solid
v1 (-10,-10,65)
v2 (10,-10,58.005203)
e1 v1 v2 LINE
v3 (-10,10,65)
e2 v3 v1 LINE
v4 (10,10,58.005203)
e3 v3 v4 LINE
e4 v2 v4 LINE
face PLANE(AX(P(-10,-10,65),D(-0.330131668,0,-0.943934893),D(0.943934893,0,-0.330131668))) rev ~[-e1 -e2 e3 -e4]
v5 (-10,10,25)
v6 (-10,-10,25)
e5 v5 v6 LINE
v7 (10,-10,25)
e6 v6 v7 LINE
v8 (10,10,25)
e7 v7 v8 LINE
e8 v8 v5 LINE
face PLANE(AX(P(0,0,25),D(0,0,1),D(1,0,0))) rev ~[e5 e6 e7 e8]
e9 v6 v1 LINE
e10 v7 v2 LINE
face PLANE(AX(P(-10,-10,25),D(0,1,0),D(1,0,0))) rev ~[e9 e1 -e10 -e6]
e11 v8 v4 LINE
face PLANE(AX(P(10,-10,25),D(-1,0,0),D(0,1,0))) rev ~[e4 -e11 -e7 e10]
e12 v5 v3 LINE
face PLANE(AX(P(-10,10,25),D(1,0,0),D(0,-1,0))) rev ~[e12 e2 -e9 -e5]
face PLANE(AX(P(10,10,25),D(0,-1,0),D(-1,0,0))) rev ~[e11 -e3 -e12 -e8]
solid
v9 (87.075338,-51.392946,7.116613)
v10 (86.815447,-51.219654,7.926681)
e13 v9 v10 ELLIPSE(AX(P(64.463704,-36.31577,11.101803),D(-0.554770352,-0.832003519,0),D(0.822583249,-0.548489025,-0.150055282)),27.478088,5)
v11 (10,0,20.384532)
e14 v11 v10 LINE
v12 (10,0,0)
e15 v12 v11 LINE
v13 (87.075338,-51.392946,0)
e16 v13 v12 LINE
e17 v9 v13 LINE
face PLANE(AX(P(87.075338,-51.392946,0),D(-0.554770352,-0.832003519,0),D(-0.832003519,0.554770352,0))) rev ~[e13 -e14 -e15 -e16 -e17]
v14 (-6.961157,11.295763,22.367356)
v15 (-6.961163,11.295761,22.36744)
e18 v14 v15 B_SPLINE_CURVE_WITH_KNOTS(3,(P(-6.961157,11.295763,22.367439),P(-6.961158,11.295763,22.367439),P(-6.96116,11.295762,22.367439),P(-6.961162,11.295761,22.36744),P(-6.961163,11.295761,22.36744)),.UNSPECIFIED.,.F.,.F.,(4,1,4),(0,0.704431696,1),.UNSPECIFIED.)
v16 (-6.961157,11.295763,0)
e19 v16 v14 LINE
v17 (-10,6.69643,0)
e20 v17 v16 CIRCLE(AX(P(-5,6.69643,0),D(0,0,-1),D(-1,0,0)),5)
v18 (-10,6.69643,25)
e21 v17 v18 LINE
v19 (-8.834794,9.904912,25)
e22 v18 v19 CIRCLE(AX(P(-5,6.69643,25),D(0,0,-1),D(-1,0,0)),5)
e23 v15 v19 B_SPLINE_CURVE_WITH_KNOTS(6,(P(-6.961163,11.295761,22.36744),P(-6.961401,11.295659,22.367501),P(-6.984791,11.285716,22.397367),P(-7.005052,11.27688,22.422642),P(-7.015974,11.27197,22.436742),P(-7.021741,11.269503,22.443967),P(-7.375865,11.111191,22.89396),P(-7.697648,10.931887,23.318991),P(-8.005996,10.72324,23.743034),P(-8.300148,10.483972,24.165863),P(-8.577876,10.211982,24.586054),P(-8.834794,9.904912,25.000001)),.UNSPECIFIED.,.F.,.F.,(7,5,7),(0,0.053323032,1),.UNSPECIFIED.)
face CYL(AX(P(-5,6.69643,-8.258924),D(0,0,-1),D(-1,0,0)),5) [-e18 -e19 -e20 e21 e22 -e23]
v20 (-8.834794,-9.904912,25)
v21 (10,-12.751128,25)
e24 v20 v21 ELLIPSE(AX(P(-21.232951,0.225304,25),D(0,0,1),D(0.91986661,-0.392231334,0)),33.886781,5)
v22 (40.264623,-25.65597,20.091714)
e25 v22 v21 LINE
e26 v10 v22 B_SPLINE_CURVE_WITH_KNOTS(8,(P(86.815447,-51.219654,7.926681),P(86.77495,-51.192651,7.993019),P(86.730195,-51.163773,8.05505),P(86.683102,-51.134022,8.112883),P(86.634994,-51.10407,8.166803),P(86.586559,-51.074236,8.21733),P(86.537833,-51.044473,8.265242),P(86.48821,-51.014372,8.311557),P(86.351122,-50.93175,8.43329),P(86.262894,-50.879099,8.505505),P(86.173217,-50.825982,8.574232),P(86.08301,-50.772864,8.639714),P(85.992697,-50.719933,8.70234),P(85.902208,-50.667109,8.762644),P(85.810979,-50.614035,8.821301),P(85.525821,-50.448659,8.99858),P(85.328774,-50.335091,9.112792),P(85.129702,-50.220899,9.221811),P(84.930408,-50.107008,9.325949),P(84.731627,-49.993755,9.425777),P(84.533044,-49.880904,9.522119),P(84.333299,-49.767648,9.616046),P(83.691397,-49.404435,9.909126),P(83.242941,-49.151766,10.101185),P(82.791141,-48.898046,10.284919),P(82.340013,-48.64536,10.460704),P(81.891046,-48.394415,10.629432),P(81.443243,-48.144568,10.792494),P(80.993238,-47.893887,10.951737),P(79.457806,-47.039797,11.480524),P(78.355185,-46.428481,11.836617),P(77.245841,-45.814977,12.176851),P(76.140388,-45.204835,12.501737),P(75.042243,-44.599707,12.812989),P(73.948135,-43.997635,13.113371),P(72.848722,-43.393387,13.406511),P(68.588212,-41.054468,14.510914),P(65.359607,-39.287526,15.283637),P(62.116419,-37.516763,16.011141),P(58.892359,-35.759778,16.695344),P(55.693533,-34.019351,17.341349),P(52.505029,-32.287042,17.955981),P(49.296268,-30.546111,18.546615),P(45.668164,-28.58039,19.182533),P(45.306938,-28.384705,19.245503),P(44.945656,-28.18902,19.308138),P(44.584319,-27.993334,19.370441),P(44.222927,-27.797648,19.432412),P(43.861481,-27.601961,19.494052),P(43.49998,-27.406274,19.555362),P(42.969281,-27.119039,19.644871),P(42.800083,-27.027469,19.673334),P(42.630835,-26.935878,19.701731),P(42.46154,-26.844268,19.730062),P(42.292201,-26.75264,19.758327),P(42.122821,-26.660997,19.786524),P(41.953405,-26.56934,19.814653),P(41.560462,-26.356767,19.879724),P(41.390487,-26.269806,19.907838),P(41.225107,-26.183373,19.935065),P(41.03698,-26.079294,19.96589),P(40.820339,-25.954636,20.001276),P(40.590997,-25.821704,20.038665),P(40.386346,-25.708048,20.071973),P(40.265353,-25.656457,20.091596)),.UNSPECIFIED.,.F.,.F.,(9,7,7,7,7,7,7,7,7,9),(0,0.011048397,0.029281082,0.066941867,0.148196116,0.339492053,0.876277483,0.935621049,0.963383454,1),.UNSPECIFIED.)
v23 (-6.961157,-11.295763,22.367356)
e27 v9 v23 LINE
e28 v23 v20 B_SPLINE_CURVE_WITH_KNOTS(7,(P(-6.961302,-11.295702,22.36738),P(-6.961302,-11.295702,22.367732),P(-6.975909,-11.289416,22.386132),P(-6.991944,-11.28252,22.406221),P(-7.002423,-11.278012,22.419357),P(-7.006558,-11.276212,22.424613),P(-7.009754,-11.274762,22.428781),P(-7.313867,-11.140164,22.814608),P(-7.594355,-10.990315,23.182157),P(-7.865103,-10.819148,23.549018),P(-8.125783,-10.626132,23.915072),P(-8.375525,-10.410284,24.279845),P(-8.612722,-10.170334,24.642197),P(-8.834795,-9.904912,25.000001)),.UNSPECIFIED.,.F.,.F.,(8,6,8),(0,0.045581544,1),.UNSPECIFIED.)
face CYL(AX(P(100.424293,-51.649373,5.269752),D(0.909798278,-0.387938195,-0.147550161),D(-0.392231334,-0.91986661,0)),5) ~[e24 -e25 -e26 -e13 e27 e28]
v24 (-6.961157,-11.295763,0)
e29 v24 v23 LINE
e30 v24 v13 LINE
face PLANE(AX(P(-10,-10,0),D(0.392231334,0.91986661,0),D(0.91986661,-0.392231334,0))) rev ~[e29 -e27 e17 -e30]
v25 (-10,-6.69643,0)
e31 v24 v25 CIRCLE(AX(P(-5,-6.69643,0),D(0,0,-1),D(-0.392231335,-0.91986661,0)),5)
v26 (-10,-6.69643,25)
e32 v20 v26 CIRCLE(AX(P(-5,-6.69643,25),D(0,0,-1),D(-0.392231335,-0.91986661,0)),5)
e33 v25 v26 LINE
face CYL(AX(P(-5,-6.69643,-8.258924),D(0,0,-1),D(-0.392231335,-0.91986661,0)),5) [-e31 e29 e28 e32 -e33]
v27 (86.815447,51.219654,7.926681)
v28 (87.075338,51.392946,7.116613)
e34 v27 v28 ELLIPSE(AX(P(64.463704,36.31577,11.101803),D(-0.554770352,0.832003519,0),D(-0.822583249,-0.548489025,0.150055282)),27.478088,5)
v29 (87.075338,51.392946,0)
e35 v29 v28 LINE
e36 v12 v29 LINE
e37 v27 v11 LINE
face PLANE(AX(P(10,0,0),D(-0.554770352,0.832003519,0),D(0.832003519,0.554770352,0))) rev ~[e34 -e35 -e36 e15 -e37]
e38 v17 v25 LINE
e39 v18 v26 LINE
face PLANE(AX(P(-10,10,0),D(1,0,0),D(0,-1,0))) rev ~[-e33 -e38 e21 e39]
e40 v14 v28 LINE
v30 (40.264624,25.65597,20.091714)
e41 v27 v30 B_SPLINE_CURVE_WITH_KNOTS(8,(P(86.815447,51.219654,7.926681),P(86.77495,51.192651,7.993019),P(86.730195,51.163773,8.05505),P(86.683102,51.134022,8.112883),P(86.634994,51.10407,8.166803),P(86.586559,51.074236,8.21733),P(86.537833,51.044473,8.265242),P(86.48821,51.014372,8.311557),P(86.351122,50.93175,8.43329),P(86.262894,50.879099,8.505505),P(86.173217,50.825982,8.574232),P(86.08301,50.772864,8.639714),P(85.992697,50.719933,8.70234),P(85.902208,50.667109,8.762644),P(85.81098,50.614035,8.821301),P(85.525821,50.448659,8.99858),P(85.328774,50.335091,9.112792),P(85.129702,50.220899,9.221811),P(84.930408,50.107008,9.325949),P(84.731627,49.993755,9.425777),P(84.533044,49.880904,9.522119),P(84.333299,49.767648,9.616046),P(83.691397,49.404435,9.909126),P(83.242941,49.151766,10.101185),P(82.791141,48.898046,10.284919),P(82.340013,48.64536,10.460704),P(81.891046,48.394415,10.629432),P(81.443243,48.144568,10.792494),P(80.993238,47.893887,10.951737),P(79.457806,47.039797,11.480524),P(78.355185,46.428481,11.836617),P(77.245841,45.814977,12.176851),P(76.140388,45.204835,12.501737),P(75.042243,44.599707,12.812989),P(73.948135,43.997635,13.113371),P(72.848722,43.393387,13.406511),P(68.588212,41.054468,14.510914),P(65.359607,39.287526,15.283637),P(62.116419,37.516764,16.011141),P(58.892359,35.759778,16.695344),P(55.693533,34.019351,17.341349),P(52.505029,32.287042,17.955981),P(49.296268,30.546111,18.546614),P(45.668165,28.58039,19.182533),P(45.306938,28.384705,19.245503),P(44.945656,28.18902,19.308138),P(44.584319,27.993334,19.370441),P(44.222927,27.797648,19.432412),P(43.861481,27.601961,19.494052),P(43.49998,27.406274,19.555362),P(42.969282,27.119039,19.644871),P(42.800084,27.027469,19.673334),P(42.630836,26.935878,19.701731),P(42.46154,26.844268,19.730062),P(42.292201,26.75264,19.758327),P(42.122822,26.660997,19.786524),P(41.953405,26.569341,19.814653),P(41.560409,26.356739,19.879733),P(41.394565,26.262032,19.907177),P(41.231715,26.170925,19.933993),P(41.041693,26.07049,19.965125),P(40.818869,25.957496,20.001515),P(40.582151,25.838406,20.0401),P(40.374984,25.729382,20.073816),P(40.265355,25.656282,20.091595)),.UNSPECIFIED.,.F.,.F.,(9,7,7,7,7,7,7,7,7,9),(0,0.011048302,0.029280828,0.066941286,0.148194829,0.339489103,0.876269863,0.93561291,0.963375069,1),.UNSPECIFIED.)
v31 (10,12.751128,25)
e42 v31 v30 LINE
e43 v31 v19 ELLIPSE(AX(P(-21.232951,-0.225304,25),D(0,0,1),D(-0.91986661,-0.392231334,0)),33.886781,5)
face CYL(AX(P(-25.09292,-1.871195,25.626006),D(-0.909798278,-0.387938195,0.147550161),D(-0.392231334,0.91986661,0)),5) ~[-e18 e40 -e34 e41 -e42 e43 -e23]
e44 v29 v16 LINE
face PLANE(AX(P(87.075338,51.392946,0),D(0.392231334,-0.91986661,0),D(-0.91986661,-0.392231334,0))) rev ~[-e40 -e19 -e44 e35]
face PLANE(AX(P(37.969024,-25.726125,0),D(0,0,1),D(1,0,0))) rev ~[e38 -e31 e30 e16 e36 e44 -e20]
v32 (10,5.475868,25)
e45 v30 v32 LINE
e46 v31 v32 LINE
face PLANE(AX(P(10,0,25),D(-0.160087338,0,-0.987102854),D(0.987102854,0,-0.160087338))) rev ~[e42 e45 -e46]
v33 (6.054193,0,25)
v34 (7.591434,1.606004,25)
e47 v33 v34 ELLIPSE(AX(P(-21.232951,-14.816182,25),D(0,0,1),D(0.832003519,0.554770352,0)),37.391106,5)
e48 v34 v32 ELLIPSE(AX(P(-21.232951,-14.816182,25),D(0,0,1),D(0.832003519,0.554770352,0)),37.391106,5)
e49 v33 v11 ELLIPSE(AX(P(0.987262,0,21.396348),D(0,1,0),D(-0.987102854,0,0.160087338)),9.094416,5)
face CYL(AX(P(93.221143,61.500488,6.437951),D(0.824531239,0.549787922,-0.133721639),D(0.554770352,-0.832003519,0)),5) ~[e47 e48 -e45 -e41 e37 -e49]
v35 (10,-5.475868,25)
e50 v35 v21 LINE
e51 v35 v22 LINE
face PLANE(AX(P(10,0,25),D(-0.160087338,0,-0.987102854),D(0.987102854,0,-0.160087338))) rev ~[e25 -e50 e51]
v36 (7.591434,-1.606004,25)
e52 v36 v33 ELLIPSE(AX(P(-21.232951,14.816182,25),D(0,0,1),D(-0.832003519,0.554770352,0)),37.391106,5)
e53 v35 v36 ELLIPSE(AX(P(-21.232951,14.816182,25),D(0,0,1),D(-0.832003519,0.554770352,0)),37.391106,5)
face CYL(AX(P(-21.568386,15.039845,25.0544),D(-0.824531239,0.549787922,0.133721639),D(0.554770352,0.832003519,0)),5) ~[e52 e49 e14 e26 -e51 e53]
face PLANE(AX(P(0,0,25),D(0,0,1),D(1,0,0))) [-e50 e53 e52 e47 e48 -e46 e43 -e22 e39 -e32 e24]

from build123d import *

# Parameters (mm, degrees)
F1_DEPTH      = 20
F2_DEPTH      = 25
F4_DEPTH      = 40
F6_DEPTH      = 61.3939463923
F8_DEPTH      = 84.6
F11_T1_DEPTH  = 41.5178477753
F11_T3_DEPTH  = 137.9615849437
F11_T5_DEPTH  = 137.9615849437
F11_T10_DEPTH = 139.2179253021
F11_T15_DEPTH = 139.2179253021
F11_T21_DEPTH = 139.2179253021
F11_T27_DEPTH = 139.2179253021


# Not quite as in the source:
# - a fillet or chamfer that OpenCascade refuses, or shapes differently, is made with other operations: its cross-section is extruded or revolved along the edge and cut away or added
# - a feature of the source that left no trace in its solid (it failed there, or was rolled back) is left out


with BuildPart() as f1:
    # F0 (on Top) → F1 (new body)
    with BuildSketch(Plane.XY):
        Polygon((87.0753377676, -51.3929463923), (10, 0), (10, -10), (-10, -10), align=None)
        Polygon((10, 0), (10, 10), (-10, 10), (-10, -10), (10, -10), align=None)
        Polygon((-10, 10), (10, 10), (10, 0), (87.0753377676, 51.3929463923), align=None)
    extrude(amount=F1_DEPTH)

    # F0 (on Top) → F2 (join)
    with BuildSketch(Plane.XY):
        Polygon((10, 0), (10, 10), (-10, 10), (-10, -10), (10, -10), align=None)
        Polygon((-10, 10), (10, 10), (10, 0), (87.0753377676, 51.3929463923), align=None)
        Polygon((87.0753377676, -51.3929463923), (10, 0), (10, -10), (-10, -10), align=None)
    extrude(amount=F2_DEPTH)

    # F7 (on Front) → F8 (cut, symmetric)
    with BuildSketch(Plane.XZ):
        Polygon((87.0753377676, 25), (10, 25), (87.0753377676, 12.5), align=None)
    extrude(amount=F8_DEPTH, both=True, mode=Mode.SUBTRACT)

    # F11: fillet of radius 5 on 6 edges, made by hand

    # F11_s2 → F11_t1 (cut)
    with BuildSketch(Plane.XY.offset(-8.2589238876)):
        with BuildLine():
            ThreePointArc((-6.9611566724, -11.2957634951), (-9.1716773222, -9.452715684), (-10, -6.6964304449))
            Line((-10, -6.6964304449), (-10, -10))
            Line((-10, -10), (-6.9611566724, -11.2957634951))
        make_face()
        with BuildLine():
            ThreePointArc((-10, 6.6964304449), (-9.1716773222, 9.452715684), (-6.9611566724, 11.2957634951))
            Line((-6.9611566724, 11.2957634951), (-10, 10))
            Line((-10, 10), (-10, 6.6964304449))
        make_face()
    extrude(amount=F11_T1_DEPTH, mode=Mode.SUBTRACT)

    # F11_s4 → F11_t3 (cut)
    with BuildSketch(Plane(origin=(100.6464893313, -42.9156862419, -16.3227454213), x_dir=(-0.3922313345, -0.91986661, 0), z_dir=(-0.909798278, 0.3879381954, 0.1475501607))):
        with BuildLine():
            ThreePointArc((13.1209794451, 21.83145176), (11.5437136037, 25.4762961846), (7.8070230934, 26.821585166))
            Line((7.8070230934, 26.821585166), (13.1209794451, 27.1559149751))
            Line((13.1209794451, 27.1559149751), (13.1209794451, 21.83145176))
        make_face()
    extrude(amount=F11_T3_DEPTH, mode=Mode.SUBTRACT)

    # F11_s6 → F11_t5 (cut)
    with BuildSketch(Plane(origin=(-24.87072308, -10.604882052, 4.0335086099), x_dir=(-0.3922313345, 0.91986661, 0), z_dir=(0.909798278, 0.3879381954, -0.1475501607))):
        with BuildLine():
            ThreePointArc((13.1209794451, 21.83145176), (11.5437136037, 25.4762961846), (7.8070230934, 26.821585166))
            Line((7.8070230934, 26.821585166), (13.1209794451, 27.1559149751))
            Line((13.1209794451, 27.1559149751), (13.1209794451, 21.83145176))
        make_face()
    extrude(amount=F11_T5_DEPTH, mode=Mode.SUBTRACT)


with BuildPart() as f4:
    # F3 (on face) → F4 (new body)
    with BuildSketch(Plane.XY.offset(25)):
        Polygon((10, 10), (-10, 10), (-10, -10), (10, -10), (10, 0), align=None)
    extrude(amount=F4_DEPTH)

    # F5 (on face) → F6 (cut, through all)
    with BuildSketch(Plane.XZ.offset(10)):
        Polygon((10, 65), (-10, 65), (10, 58.0052025616), align=None)
    extrude(amount=-F6_DEPTH, mode=Mode.SUBTRACT)


with BuildPart() as f11_tool8:
    # F11_s9 → F11_t10 (new body)
    with BuildSketch(Plane(origin=(-24.2435670935, 16.1653309616, 3.931797089), x_dir=(0.5547703521, 0.8320035195, 0), z_dir=(0.8245312391, -0.5497879218, -0.133721639))):
        with BuildLine():
            ThreePointArc((5.5477035213, 21.3140260519), (4.2368967072, 24.6889117739), (0.9917620666, 26.2942682155))
            Line((0.9917620666, 26.2942682155), (5.5477035213, 25.8880420385))
            Line((5.5477035213, 25.8880420385), (5.5477035213, 21.3140260519))
        make_face()
    extrude(amount=F11_T10_DEPTH)

    split(bisect_by=Plane(origin=(3.077701436, -4.6157088547, 0), x_dir=(0, 0, 1), z_dir=(0.5547703521, -0.8320035195, 0)), keep=Keep.TOP)


with BuildPart() as f1_1:
    add(f1.part)

    # F11_t7: cut F11_tool8
    add(f11_tool8.part, mode=Mode.SUBTRACT)


with BuildPart() as f11_tool13:
    # F11_s14 → F11_t15 (new body)
    with BuildSketch(Plane(origin=(90.5459613675, 60.3750028658, -14.6846520544), x_dir=(0.5547703521, -0.8320035195, 0), z_dir=(-0.8245312391, -0.5497879218, 0.133721639))):
        with BuildLine():
            ThreePointArc((5.5477035213, 21.3140260519), (4.2368967072, 24.6889117739), (0.9917620666, 26.2942682155))
            Line((0.9917620666, 26.2942682155), (5.5477035213, 25.8880420385))
            Line((5.5477035213, 25.8880420385), (5.5477035213, 21.3140260519))
        make_face()
    extrude(amount=F11_T15_DEPTH)

    split(bisect_by=Plane(origin=(3.077701436, 4.6157088547, 0), x_dir=(0, 0, 1), z_dir=(0.5547703521, 0.8320035195, 0)), keep=Keep.TOP)


with BuildPart() as f1_2:
    add(f1_1.part)

    # F11_t12: cut F11_tool13
    add(f11_tool13.part, mode=Mode.SUBTRACT)


with BuildPart() as f11_tool19:
    # F11_s20 → F11_t21 (new body)
    with BuildSketch(Plane(origin=(-24.2435670935, 16.1653309616, 3.931797089), x_dir=(0.5547703521, 0.8320035195, 0), z_dir=(0.8245312391, -0.5497879218, -0.133721639))):
        with BuildLine():
            ThreePointArc((5.5477035213, 21.3140260519), (4.2368967072, 24.6889117739), (0.9917620666, 26.2942682155))
            Line((0.9917620666, 26.2942682155), (5.5477035213, 25.8880420385))
            Line((5.5477035213, 25.8880420385), (5.5477035213, 21.3140260519))
        make_face()
    extrude(amount=F11_T21_DEPTH)

    split(bisect_by=Plane(origin=(3.077701436, -4.6157088547, 0), x_dir=(0, 0, 1), z_dir=(-0.5547703521, 0.8320035195, 0)), keep=Keep.TOP)

    split(bisect_by=Plane.XY.offset(25), keep=Keep.BOTTOM)

    split(bisect_by=Plane(origin=(-5.1464592774, 12.0695508825, 0), x_dir=(0, 0, 1), z_dir=(0.3922313345, -0.91986661, 0)), keep=Keep.TOP)


with BuildPart() as f11_tool25:
    # F11_s26 → F11_t27 (new body)
    with BuildSketch(Plane(origin=(90.5459613675, 60.3750028658, -14.6846520544), x_dir=(0.5547703521, -0.8320035195, 0), z_dir=(-0.8245312391, -0.5497879218, 0.133721639))):
        with BuildLine():
            ThreePointArc((5.5477035213, 21.3140260519), (4.2368967072, 24.6889117739), (0.9917620666, 26.2942682155))
            Line((0.9917620666, 26.2942682155), (5.5477035213, 25.8880420385))
            Line((5.5477035213, 25.8880420385), (5.5477035213, 21.3140260519))
        make_face()
    extrude(amount=F11_T27_DEPTH)

    split(bisect_by=Plane(origin=(3.077701436, 4.6157088547, 0), x_dir=(0, 0, 1), z_dir=(-0.5547703521, -0.8320035195, 0)), keep=Keep.TOP)

    split(bisect_by=Plane(origin=(-5.1464592774, -12.0695508825, 0), x_dir=(0, 0, 1), z_dir=(0.3922313345, 0.91986661, 0)), keep=Keep.TOP)

    split(bisect_by=Plane.XY.offset(25), keep=Keep.BOTTOM)


with BuildPart() as f11_tool19_1:
    add(f11_tool19.part)

    # F11_t31: intersect F11_tool25
    add(f11_tool25.part, mode=Mode.INTERSECT)


with BuildPart() as f1_3:
    add(f1_2.part)

    # F11_t17: cut F11_tool19
    add(f11_tool19_1.part, mode=Mode.SUBTRACT)


solid = Compound([f4.part, f1_3.part])
